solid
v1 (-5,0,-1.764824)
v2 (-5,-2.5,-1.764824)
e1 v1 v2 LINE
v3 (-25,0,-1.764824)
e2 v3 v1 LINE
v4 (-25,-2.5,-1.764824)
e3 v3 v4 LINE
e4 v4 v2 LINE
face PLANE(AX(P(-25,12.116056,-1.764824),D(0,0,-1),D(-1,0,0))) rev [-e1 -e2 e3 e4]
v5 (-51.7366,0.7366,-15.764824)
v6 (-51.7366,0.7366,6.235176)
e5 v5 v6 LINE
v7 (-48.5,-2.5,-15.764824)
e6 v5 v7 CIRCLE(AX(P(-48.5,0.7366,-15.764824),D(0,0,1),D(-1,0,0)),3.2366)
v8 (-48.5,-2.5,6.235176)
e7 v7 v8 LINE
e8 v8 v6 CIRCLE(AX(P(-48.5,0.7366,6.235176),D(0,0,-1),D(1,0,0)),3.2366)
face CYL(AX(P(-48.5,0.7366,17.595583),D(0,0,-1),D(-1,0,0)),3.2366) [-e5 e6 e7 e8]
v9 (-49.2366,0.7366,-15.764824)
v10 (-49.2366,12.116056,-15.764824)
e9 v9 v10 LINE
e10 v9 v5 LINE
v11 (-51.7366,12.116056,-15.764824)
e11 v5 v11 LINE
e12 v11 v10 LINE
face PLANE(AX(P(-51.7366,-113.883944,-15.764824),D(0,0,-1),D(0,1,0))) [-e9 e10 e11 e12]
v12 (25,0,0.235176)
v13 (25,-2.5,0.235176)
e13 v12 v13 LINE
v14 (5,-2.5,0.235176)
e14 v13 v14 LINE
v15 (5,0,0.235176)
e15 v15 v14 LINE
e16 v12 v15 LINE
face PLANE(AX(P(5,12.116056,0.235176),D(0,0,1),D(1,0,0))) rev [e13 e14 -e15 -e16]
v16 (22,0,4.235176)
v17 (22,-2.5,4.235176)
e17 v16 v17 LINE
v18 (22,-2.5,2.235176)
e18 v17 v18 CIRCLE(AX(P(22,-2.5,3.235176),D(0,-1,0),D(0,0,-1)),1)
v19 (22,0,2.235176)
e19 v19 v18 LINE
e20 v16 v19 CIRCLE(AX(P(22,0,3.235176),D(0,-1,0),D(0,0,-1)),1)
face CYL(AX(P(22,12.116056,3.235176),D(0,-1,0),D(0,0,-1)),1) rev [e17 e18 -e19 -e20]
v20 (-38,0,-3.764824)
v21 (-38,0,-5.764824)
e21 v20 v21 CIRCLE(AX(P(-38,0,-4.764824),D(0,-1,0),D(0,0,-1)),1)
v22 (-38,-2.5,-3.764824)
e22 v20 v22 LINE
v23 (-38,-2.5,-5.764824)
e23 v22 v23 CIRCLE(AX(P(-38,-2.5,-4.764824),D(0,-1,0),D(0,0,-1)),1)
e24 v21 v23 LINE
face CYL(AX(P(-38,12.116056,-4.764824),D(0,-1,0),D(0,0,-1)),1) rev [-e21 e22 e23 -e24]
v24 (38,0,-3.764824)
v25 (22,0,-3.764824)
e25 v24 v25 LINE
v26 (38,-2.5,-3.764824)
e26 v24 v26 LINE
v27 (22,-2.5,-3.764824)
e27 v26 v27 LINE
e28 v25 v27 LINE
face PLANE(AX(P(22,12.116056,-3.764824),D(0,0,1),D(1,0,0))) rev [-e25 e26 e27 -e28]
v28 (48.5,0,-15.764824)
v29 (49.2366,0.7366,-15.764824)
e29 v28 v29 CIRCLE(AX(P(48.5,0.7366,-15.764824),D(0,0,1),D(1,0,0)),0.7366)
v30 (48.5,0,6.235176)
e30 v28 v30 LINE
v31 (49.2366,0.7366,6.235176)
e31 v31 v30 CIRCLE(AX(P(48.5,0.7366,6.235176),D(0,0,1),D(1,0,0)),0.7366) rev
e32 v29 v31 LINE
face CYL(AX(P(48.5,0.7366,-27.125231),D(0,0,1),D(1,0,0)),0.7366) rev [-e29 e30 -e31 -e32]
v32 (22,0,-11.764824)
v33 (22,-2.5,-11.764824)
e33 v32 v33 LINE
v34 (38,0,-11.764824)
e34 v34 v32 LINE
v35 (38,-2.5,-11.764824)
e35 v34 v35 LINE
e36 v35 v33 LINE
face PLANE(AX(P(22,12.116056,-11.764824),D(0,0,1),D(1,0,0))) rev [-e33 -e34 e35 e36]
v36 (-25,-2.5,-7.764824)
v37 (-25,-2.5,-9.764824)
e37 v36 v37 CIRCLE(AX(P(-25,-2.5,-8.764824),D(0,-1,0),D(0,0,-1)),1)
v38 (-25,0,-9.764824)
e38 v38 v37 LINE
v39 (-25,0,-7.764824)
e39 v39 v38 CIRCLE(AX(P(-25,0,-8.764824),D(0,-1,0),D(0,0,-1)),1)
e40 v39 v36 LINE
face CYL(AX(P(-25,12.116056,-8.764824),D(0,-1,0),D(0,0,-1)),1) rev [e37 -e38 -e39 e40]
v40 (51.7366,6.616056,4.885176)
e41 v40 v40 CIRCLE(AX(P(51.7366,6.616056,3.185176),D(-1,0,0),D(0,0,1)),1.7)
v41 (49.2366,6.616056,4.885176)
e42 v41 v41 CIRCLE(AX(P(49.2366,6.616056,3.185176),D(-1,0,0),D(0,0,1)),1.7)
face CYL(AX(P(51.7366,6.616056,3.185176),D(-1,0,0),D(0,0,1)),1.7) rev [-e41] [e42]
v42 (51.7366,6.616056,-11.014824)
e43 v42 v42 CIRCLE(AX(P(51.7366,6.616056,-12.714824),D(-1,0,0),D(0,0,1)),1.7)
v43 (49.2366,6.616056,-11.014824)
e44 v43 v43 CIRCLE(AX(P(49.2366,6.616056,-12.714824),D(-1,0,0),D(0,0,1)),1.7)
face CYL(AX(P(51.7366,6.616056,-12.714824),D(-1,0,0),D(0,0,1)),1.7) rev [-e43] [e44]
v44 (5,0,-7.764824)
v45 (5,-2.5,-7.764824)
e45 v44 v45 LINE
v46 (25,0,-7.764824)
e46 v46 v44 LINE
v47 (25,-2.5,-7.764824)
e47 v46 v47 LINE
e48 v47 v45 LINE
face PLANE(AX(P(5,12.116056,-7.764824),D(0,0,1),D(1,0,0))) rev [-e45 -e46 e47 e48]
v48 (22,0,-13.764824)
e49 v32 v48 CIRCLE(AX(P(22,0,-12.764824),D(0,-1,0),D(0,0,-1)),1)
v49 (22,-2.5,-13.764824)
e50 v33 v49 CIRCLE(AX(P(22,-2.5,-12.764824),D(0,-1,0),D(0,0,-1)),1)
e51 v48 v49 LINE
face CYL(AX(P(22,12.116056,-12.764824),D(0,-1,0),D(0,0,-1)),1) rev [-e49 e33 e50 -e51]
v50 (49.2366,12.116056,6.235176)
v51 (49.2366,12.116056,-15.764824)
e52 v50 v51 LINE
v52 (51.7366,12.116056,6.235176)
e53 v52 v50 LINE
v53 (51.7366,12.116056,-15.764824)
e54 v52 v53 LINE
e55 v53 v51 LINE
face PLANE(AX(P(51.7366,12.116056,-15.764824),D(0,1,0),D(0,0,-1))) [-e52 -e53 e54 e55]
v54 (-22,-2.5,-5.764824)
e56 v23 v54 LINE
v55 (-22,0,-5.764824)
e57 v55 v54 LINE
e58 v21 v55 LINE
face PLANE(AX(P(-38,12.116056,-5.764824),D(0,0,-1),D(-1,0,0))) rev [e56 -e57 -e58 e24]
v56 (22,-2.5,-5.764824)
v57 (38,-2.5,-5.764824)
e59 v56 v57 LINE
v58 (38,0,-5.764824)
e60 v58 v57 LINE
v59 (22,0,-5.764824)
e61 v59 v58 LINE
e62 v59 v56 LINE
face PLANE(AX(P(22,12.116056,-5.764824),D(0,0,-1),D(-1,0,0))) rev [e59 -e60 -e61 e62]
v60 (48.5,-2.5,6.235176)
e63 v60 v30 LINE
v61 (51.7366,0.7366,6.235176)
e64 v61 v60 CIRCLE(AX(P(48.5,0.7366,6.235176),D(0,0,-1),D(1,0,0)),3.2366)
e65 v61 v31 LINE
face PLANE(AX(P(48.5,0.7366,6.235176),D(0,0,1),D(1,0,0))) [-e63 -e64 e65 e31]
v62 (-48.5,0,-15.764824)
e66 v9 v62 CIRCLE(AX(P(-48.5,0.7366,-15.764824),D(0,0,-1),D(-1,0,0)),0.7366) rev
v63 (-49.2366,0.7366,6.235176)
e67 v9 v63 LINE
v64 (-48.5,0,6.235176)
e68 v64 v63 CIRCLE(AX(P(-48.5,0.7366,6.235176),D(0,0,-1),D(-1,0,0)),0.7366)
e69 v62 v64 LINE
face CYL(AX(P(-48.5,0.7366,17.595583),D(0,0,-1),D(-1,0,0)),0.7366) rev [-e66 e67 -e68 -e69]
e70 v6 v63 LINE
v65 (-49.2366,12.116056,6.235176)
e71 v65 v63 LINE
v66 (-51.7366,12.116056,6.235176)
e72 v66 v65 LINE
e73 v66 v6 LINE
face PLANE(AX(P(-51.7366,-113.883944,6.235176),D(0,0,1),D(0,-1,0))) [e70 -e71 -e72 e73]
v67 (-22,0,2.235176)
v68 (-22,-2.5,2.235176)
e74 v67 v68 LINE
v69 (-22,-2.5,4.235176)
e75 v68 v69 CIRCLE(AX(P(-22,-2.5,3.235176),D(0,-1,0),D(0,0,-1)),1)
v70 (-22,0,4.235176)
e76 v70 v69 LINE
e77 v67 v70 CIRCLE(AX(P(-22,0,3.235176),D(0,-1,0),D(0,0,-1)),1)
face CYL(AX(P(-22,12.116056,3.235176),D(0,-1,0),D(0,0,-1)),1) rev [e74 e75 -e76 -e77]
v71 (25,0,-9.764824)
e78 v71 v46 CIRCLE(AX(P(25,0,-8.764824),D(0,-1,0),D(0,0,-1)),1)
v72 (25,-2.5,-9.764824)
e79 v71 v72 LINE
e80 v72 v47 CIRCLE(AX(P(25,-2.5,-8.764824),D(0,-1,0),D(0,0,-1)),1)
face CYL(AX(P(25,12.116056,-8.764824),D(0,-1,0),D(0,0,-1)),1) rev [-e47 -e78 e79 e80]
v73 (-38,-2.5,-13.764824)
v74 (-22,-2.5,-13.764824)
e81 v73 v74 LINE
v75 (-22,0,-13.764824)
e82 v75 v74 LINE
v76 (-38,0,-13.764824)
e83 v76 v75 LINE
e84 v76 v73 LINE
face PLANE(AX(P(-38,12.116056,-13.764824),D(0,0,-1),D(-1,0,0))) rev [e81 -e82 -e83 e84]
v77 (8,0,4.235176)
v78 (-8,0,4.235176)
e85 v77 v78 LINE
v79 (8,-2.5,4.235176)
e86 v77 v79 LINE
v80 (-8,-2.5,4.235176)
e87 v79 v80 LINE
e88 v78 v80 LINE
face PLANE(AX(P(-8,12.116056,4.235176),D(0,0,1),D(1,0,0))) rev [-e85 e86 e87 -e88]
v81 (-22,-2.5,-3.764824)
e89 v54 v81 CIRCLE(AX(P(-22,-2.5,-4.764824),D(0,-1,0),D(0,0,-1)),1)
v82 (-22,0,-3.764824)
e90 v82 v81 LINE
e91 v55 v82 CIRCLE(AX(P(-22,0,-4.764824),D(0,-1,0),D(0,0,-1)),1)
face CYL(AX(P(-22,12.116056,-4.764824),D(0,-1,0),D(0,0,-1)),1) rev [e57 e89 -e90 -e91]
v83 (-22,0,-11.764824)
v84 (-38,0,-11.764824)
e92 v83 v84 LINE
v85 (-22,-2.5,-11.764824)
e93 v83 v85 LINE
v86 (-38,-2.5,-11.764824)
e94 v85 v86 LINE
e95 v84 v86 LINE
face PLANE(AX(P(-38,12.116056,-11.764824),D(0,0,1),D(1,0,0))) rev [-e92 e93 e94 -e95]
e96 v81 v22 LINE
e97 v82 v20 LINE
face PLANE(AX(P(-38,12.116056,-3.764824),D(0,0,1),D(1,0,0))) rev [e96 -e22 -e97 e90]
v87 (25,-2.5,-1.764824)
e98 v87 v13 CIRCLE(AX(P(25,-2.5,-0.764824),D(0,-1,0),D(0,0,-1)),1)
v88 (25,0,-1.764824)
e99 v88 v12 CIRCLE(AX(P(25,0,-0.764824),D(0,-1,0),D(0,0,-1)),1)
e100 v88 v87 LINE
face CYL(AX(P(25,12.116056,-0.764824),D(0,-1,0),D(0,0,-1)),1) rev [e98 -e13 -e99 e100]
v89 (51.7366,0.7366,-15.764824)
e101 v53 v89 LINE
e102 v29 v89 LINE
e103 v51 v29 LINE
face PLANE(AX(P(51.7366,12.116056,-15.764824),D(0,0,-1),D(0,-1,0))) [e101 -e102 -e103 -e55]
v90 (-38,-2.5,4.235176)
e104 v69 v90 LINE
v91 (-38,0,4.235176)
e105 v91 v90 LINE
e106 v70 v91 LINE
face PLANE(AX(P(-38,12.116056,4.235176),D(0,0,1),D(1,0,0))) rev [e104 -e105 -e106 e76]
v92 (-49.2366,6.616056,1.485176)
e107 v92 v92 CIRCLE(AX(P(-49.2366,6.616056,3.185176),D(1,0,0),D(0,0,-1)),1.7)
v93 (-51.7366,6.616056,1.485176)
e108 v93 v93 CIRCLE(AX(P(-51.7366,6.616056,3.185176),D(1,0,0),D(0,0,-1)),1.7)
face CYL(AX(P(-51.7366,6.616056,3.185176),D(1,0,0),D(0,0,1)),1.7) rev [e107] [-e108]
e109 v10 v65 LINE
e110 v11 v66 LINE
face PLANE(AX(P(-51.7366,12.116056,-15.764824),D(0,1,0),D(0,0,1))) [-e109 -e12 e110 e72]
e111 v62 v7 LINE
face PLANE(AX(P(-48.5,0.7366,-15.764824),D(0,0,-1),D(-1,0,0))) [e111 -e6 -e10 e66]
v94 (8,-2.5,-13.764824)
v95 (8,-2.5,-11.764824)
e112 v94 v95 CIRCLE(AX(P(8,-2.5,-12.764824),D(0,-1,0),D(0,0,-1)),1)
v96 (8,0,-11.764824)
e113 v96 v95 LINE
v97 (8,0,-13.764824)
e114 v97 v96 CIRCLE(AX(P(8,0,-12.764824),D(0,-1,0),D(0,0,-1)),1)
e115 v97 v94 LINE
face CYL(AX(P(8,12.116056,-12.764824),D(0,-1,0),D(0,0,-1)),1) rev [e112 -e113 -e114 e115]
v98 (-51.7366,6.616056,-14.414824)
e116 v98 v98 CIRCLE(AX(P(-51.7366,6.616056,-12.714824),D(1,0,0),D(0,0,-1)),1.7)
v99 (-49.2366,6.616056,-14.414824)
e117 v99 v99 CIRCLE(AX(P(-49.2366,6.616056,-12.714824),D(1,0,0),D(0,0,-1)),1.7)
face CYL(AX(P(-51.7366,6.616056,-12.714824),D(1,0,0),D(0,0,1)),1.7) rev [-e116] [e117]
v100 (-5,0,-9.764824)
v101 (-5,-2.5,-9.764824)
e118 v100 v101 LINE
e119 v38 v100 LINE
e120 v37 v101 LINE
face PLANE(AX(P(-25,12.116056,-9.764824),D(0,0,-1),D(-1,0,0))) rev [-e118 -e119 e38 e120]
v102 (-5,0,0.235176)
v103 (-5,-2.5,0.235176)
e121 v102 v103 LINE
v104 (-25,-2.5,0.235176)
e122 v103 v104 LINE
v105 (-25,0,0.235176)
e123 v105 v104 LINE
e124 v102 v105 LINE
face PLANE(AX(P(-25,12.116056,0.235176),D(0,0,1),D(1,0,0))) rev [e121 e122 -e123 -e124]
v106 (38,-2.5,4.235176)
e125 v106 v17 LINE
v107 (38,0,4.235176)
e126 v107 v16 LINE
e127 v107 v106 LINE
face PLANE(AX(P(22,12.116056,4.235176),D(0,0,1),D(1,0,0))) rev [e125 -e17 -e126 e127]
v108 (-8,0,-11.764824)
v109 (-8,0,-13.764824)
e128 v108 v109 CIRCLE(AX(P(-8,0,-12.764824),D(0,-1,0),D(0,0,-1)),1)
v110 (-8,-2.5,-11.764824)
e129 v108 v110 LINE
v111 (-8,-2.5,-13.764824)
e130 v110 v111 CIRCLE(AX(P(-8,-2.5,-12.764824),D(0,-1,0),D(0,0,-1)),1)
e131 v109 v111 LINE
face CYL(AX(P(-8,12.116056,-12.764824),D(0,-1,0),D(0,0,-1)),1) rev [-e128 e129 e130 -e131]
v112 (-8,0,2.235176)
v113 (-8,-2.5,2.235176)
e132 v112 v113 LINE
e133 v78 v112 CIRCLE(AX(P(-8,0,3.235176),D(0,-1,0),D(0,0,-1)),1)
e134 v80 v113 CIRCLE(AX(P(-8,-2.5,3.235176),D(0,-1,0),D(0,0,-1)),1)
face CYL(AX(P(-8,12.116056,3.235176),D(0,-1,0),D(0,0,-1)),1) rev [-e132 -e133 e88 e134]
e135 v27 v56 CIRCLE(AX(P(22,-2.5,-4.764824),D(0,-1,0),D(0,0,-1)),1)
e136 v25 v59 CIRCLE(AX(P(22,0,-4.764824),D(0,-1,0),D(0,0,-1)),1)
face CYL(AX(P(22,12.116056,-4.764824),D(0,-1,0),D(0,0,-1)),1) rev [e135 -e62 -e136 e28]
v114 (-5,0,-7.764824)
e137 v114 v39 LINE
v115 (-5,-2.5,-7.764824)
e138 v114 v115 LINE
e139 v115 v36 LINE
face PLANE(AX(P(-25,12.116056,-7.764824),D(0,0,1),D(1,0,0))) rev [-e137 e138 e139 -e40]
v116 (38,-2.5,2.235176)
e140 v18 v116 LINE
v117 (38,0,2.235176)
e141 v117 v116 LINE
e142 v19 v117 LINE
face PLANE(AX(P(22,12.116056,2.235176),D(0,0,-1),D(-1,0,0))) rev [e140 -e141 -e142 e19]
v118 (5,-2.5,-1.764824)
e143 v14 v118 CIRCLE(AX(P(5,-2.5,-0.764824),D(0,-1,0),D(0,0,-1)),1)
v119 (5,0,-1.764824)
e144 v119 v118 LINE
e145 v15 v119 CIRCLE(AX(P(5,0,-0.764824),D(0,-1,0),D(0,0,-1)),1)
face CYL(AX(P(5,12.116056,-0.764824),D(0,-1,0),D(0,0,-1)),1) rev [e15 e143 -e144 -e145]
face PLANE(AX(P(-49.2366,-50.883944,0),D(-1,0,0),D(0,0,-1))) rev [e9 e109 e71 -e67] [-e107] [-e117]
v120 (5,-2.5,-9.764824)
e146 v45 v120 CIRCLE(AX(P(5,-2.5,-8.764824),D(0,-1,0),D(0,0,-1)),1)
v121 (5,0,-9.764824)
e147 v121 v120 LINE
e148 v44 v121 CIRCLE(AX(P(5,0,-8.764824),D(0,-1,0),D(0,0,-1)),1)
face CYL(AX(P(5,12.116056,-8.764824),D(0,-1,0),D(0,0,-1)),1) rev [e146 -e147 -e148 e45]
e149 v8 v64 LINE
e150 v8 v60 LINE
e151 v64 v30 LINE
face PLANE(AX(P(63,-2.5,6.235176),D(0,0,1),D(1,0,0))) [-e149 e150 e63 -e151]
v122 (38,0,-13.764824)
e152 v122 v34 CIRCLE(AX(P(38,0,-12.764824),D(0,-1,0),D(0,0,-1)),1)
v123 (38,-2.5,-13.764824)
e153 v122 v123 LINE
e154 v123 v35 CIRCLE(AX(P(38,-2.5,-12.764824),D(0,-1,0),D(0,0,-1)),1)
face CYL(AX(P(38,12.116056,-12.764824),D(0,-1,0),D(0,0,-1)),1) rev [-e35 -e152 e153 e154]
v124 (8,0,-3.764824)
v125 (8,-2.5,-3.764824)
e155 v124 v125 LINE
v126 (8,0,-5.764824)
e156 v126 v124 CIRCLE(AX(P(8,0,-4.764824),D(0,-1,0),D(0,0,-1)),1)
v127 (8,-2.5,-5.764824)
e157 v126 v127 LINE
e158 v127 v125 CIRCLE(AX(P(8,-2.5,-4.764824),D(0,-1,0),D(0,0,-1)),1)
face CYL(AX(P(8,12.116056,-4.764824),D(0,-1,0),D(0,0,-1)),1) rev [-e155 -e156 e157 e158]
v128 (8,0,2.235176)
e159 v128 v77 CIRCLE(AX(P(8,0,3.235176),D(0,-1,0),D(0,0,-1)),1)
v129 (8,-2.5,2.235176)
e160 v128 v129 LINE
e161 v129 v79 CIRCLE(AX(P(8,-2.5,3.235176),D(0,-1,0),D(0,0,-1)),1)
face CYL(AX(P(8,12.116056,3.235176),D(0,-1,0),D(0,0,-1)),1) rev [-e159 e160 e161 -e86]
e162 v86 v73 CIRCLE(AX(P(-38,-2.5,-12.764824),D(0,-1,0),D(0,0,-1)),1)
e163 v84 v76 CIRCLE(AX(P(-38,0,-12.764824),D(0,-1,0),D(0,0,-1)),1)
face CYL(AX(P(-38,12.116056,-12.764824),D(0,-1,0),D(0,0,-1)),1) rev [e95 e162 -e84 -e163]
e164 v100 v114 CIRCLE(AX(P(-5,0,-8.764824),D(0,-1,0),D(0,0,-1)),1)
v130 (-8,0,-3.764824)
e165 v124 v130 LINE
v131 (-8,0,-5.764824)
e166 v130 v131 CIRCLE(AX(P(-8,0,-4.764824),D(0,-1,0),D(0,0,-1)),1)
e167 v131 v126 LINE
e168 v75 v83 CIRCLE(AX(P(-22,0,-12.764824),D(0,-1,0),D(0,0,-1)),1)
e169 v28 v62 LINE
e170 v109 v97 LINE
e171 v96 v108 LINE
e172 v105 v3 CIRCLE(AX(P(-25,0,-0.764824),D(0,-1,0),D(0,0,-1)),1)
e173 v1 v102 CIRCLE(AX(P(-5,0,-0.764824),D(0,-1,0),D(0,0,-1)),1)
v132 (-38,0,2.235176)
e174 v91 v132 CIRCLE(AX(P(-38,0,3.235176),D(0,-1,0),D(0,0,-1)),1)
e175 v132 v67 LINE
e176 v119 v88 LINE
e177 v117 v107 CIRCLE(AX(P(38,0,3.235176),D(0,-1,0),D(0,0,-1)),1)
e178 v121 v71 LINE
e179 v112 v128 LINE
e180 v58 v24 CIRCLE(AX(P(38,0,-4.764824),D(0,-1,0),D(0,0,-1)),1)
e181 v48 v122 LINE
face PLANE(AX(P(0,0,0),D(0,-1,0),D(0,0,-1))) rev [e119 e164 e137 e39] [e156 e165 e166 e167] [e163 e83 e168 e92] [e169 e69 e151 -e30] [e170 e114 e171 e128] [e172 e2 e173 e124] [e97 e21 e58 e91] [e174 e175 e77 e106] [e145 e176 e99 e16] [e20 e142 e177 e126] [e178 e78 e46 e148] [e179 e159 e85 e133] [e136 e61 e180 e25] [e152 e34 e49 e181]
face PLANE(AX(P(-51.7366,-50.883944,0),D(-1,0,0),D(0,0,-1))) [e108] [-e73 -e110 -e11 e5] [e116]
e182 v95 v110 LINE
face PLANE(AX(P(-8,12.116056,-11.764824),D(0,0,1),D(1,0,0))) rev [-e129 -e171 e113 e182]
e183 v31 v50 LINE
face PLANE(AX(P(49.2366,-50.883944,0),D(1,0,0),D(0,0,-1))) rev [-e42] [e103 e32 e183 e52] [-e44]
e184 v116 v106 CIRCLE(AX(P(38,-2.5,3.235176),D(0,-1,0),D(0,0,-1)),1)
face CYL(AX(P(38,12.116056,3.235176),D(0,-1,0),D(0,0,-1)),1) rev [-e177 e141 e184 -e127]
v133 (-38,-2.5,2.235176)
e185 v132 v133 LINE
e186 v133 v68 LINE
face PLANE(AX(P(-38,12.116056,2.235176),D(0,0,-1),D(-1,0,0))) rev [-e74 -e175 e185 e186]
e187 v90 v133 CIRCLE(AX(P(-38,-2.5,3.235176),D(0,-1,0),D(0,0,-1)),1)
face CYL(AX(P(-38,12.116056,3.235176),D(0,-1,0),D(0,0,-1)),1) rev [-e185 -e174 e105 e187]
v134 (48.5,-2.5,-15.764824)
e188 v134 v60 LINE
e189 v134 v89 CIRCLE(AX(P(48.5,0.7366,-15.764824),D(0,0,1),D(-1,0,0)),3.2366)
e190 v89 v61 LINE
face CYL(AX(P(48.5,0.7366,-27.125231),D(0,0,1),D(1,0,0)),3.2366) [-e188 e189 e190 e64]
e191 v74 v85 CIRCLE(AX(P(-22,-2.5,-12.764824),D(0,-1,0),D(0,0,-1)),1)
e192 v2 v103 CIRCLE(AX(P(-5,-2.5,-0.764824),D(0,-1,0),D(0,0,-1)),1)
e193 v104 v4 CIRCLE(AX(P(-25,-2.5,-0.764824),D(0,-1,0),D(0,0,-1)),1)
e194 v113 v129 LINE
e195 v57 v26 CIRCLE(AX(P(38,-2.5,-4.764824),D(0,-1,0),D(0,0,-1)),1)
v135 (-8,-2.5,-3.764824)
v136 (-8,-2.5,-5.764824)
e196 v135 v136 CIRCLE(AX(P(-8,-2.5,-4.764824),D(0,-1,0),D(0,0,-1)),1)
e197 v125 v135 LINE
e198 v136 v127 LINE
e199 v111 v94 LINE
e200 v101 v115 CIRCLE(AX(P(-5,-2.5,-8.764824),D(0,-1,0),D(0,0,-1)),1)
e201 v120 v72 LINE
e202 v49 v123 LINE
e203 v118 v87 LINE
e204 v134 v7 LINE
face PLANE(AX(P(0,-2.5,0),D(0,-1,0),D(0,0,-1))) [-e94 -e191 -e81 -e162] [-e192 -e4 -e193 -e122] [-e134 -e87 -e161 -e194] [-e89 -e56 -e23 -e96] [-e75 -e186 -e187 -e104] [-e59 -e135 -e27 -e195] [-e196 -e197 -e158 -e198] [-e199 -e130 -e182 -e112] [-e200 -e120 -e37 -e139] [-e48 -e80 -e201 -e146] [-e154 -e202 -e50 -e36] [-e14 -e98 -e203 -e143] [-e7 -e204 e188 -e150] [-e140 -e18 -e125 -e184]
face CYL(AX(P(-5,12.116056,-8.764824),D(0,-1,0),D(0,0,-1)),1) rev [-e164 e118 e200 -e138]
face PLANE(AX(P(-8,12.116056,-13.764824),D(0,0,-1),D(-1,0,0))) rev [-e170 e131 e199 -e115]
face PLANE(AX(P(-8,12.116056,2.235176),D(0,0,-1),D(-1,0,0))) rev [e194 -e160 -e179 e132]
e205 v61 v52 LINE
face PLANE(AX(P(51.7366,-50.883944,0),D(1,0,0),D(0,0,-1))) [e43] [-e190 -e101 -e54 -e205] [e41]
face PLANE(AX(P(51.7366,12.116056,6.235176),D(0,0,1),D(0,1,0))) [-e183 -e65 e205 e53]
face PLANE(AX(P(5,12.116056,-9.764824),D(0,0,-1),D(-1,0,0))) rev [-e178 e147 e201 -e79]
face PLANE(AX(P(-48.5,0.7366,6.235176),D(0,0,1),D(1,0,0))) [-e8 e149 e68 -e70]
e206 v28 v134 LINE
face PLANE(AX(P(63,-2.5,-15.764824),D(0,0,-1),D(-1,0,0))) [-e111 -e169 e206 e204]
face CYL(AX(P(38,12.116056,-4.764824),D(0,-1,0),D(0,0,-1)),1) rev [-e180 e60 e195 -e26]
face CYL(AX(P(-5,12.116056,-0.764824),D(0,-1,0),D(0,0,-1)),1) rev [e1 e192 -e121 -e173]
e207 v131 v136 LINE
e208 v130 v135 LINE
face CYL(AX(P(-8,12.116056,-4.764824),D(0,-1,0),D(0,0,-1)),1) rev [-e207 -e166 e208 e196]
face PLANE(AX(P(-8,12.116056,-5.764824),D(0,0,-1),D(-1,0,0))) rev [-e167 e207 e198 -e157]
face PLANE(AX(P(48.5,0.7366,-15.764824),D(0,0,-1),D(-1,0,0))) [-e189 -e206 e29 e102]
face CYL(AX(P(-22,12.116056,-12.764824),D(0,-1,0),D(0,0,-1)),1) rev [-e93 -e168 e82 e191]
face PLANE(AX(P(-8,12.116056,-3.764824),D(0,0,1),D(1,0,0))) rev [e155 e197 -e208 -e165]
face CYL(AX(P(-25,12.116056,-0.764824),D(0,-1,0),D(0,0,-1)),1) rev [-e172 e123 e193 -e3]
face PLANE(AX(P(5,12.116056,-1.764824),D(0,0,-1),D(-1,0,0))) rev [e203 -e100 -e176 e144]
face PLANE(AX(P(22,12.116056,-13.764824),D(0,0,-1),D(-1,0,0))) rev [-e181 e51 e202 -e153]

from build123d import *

# Parameters (mm, degrees)
SKETCH_2_W             = 126
SKETCH_2_H             = 22
SKETCH_2_R             = 1.7
SM_BASE_FLANGE_1_DEPTH = 2.5
OTHER_START            = -15.764824005
OTHER_1_DEPTH          = 22
OTHER_START_2          = -11.014823905
OTHER_1_2_DEPTH        = 12.4999998
OTHER_1_3_DEPTH        = 1.3499999
OTHER_START_3          = 4.885176095
OTHER_1_4_DEPTH        = 1.3499999
OTHER_START_4          = -14.414824105
OTHER_1_5_DEPTH        = 19.3000002
OTHER_START_5          = -51.7366
OTHER_1_6_OUTLINE_R    = 1.7
OTHER_1_6_DEPTH        = 103.4732
CUT_EXTRUDE_1_DEPTH    = 57.025302757


with BuildPart() as part:
    # 基体-法兰1: sheet metal written as solids
    # Sketch 2 → 基体-法兰1 (new body)
    with BuildSketch(Plane(origin=(0, 0, 0), x_dir=(1, 0, 0), z_dir=(0, 1, 0))):
        with Locations((0, 4.764824005)):
            Rectangle(SKETCH_2_W, SKETCH_2_H)
        with Locations(Location((57.5, 12.714824005, 0), (0, 0, 270))):
            Circle(SKETCH_2_R, mode=Mode.SUBTRACT)
        with Locations(Location((57.5, -3.185175995, 0), (0, 0, 270))):
            Circle(SKETCH_2_R, mode=Mode.SUBTRACT)
        with Locations(Location((-57.5, -3.185175995, 0), (0, 0, 90))):
            Circle(SKETCH_2_R, mode=Mode.SUBTRACT)
        with Locations(Location((-57.5, 12.714824005, 0), (0, 0, 90))):
            Circle(SKETCH_2_R, mode=Mode.SUBTRACT)
    extrude(amount=-SM_BASE_FLANGE_1_DEPTH)

    # Other 1: read off the stored shape, not the designer's step
    # Other 1 outline → Other 1 (cut)
    with BuildSketch(Plane.XY.offset(OTHER_START)):
        with BuildLine():
            Line((-63, -2.5), (-48.5, -2.5))
            ThreePointArc((-48.5, -2.5), (-50.511404982, -1.799110859), (-51.651666226, 0))
            Line((-51.651666226, 0), (-63, 0))
            Line((-63, 0), (-63, -2.5))
        make_face()
        with BuildLine():
            ThreePointArc((51.651666226, 0), (50.511404982, -1.799110859), (48.5, -2.5))
            Line((48.5, -2.5), (63, -2.5))
            Line((63, -2.5), (63, 0))
            Line((63, 0), (51.651666226, 0))
        make_face()
    extrude(amount=OTHER_1_DEPTH, mode=Mode.SUBTRACT)

    # Other 1 2 outline → Other 1 2 (add)
    with BuildSketch(Plane.XY.offset(OTHER_START_2)):
        with BuildLine():
            ThreePointArc((-51.7366, 0.7366), (-51.715296446, 0.365859759), (-51.651666226, 0))
            Line((-51.651666226, 0), (-48.5, 0))
            ThreePointArc((-48.5, 0), (-49.020854855, 0.215745145), (-49.2366, 0.7366))
            Line((-49.2366, 0.7366), (-49.2366, 12.116056017))
            Line((-49.2366, 12.116056017), (-51.7366, 12.116056017))
            Line((-51.7366, 12.116056017), (-51.7366, 0.7366))
        make_face()
        with BuildLine():
            Line((48.5, 0), (51.651666226, 0))
            ThreePointArc((51.651666226, 0), (51.715296446, 0.365859759), (51.7366, 0.7366))
            Line((51.7366, 0.7366), (51.7366, 12.116056017))
            Line((51.7366, 12.116056017), (49.2366, 12.116056017))
            Line((49.2366, 12.116056017), (49.2366, 0.7366))
            ThreePointArc((49.2366, 0.7366), (49.020854855, 0.215745145), (48.5, 0))
        make_face()
    extrude(amount=OTHER_1_2_DEPTH)

    # Other 1 3 outline → Other 1 3 (add)
    with BuildSketch(Plane.XY.offset(OTHER_START)):
        with BuildLine():
            ThreePointArc((-51.7366, 0.7366), (-51.715296446, 0.365859759), (-51.651666226, 0))
            Line((-51.651666226, 0), (-48.5, 0))
            ThreePointArc((-48.5, 0), (-49.020854855, 0.215745145), (-49.2366, 0.7366))
            Line((-49.2366, 0.7366), (-49.2366, 12.116056017))
            Line((-49.2366, 12.116056017), (-51.7366, 12.116056017))
            Line((-51.7366, 12.116056017), (-51.7366, 0.7366))
        make_face()
        with BuildLine():
            Line((48.5, 0), (51.651666226, 0))
            ThreePointArc((51.651666226, 0), (51.715296446, 0.365859759), (51.7366, 0.7366))
            Line((51.7366, 0.7366), (51.7366, 12.116056017))
            Line((51.7366, 12.116056017), (49.2366, 12.116056017))
            Line((49.2366, 12.116056017), (49.2366, 0.7366))
            ThreePointArc((49.2366, 0.7366), (49.020854855, 0.215745145), (48.5, 0))
        make_face()
    extrude(amount=OTHER_1_3_DEPTH)

    # Other 1 4 outline → Other 1 4 (add)
    with BuildSketch(Plane.XY.offset(OTHER_START_3)):
        with BuildLine():
            ThreePointArc((-51.7366, 0.7366), (-51.715296446, 0.365859759), (-51.651666226, 0))
            Line((-51.651666226, 0), (-48.5, 0))
            ThreePointArc((-48.5, 0), (-49.020854855, 0.215745145), (-49.2366, 0.7366))
            Line((-49.2366, 0.7366), (-49.2366, 12.116056017))
            Line((-49.2366, 12.116056017), (-51.7366, 12.116056017))
            Line((-51.7366, 12.116056017), (-51.7366, 0.7366))
        make_face()
        with BuildLine():
            Line((48.5, 0), (51.651666226, 0))
            ThreePointArc((51.651666226, 0), (51.715296446, 0.365859759), (51.7366, 0.7366))
            Line((51.7366, 0.7366), (51.7366, 12.116056017))
            Line((51.7366, 12.116056017), (49.2366, 12.116056017))
            Line((49.2366, 12.116056017), (49.2366, 0.7366))
            ThreePointArc((49.2366, 0.7366), (49.020854855, 0.215745145), (48.5, 0))
        make_face()
    extrude(amount=OTHER_1_4_DEPTH)

    # Other 1 5 outline → Other 1 5 (add)
    with BuildSketch(Plane.XY.offset(OTHER_START_4)):
        with BuildLine():
            ThreePointArc((49.2366, 0.7366), (49.020854855, 0.215745145), (48.5, 0))
            Line((48.5, 0), (51.651666226, 0))
            ThreePointArc((51.651666226, 0), (51.715296446, 0.365859759), (51.7366, 0.7366))
            Line((51.7366, 0.7366), (51.7366, 12.116056017))
            Line((51.7366, 12.116056017), (49.2366, 12.116056017))
            Line((49.2366, 12.116056017), (49.2366, 0.7366))
        make_face()
        with BuildLine():
            ThreePointArc((-51.7366, 0.7366), (-51.715296446, 0.365859759), (-51.651666226, 0))
            Line((-51.651666226, 0), (-48.5, 0))
            ThreePointArc((-48.5, 0), (-49.020854855, 0.215745145), (-49.2366, 0.7366))
            Line((-49.2366, 0.7366), (-49.2366, 12.116056017))
            Line((-49.2366, 12.116056017), (-51.7366, 12.116056017))
            Line((-51.7366, 12.116056017), (-51.7366, 0.7366))
        make_face()
    extrude(amount=OTHER_1_5_DEPTH)

    # Other 1 6 outline → Other 1 6 (cut)
    with BuildSketch(Plane.YZ.offset(OTHER_START_5)):
        with Locations((6.616056017, -12.714824005)):
            Circle(OTHER_1_6_OUTLINE_R)
        with Locations((6.616056017, 3.185175995)):
            Circle(OTHER_1_6_OUTLINE_R)
    extrude(amount=OTHER_1_6_DEPTH, mode=Mode.SUBTRACT)

    # 草图8 → 切除-拉伸1 (cut, through all)
    with BuildSketch(Plane.XZ.offset(2.5)):
        with BuildLine():
            Line((-8, -3.764824005), (8, -3.764824005))
            ThreePointArc((8, -3.764824005), (9, -4.764824005), (8, -5.764824005))
            Line((8, -5.764824005), (-8, -5.764824005))
            ThreePointArc((-8, -5.764824005), (-9, -4.764824005), (-8, -3.764824005))
        make_face()
        with BuildLine():
            Line((-38, -3.764824005), (-22, -3.764824005))
            ThreePointArc((-22, -3.764824005), (-21, -4.764824005), (-22, -5.764824005))
            Line((-22, -5.764824005), (-38, -5.764824005))
            ThreePointArc((-38, -5.764824005), (-39, -4.764824005), (-38, -3.764824005))
        make_face()
        with BuildLine():
            Line((22, -3.764824005), (38, -3.764824005))
            ThreePointArc((38, -3.764824005), (39, -4.764824005), (38, -5.764824005))
            Line((38, -5.764824005), (22, -5.764824005))
            ThreePointArc((22, -5.764824005), (21, -4.764824005), (22, -3.764824005))
        make_face()
        with BuildLine():
            Line((-8, -11.764824005), (8, -11.764824005))
            ThreePointArc((8, -11.764824005), (9, -12.764824005), (8, -13.764824005))
            Line((8, -13.764824005), (-8, -13.764824005))
            ThreePointArc((-8, -13.764824005), (-9, -12.764824005), (-8, -11.764824005))
        make_face()
        with BuildLine():
            Line((-38, -11.764824005), (-22, -11.764824005))
            ThreePointArc((-22, -11.764824005), (-21, -12.764824005), (-22, -13.764824005))
            Line((-22, -13.764824005), (-38, -13.764824005))
            ThreePointArc((-38, -13.764824005), (-39, -12.764824005), (-38, -11.764824005))
        make_face()
        with BuildLine():
            Line((22, -11.764824005), (38, -11.764824005))
            ThreePointArc((38, -11.764824005), (39, -12.764824005), (38, -13.764824005))
            Line((38, -13.764824005), (22, -13.764824005))
            ThreePointArc((22, -13.764824005), (21, -12.764824005), (22, -11.764824005))
        make_face()
        with BuildLine():
            Line((-8, 4.235175995), (8, 4.235175995))
            ThreePointArc((8, 4.235175995), (9, 3.235175995), (8, 2.235175995))
            Line((8, 2.235175995), (-8, 2.235175995))
            ThreePointArc((-8, 2.235175995), (-9, 3.235175995), (-8, 4.235175995))
        make_face()
        with BuildLine():
            Line((-38, 4.235175995), (-22, 4.235175995))
            ThreePointArc((-22, 4.235175995), (-21, 3.235175995), (-22, 2.235175995))
            Line((-22, 2.235175995), (-38, 2.235175995))
            ThreePointArc((-38, 2.235175995), (-39, 3.235175995), (-38, 4.235175995))
        make_face()
        with BuildLine():
            Line((22, 4.235175995), (38, 4.235175995))
            ThreePointArc((38, 4.235175995), (39, 3.235175995), (38, 2.235175995))
            Line((38, 2.235175995), (22, 2.235175995))
            ThreePointArc((22, 2.235175995), (21, 3.235175995), (22, 4.235175995))
        make_face()
        with BuildLine():
            Line((-25, 0.235175995), (-5, 0.235175995))
            ThreePointArc((-5, 0.235175995), (-4, -0.764824005), (-5, -1.764824005))
            Line((-5, -1.764824005), (-25, -1.764824005))
            ThreePointArc((-25, -1.764824005), (-26, -0.764824005), (-25, 0.235175995))
        make_face()
        with BuildLine():
            Line((5, 0.235175995), (25, 0.235175995))
            ThreePointArc((25, 0.235175995), (26, -0.764824005), (25, -1.764824005))
            Line((25, -1.764824005), (5, -1.764824005))
            ThreePointArc((5, -1.764824005), (4, -0.764824005), (5, 0.235175995))
        make_face()
        with BuildLine():
            Line((-25, -7.764824005), (-5, -7.764824005))
            ThreePointArc((-5, -7.764824005), (-4, -8.764824005), (-5, -9.764824005))
            Line((-5, -9.764824005), (-25, -9.764824005))
            ThreePointArc((-25, -9.764824005), (-26, -8.764824005), (-25, -7.764824005))
        make_face()
        with BuildLine():
            Line((5, -7.764824005), (25, -7.764824005))
            ThreePointArc((25, -7.764824005), (26, -8.764824005), (25, -9.764824005))
            Line((25, -9.764824005), (5, -9.764824005))
            ThreePointArc((5, -9.764824005), (4, -8.764824005), (5, -7.764824005))
        make_face()
    extrude(amount=-CUT_EXTRUDE_1_DEPTH, mode=Mode.SUBTRACT)


solid = part.part
